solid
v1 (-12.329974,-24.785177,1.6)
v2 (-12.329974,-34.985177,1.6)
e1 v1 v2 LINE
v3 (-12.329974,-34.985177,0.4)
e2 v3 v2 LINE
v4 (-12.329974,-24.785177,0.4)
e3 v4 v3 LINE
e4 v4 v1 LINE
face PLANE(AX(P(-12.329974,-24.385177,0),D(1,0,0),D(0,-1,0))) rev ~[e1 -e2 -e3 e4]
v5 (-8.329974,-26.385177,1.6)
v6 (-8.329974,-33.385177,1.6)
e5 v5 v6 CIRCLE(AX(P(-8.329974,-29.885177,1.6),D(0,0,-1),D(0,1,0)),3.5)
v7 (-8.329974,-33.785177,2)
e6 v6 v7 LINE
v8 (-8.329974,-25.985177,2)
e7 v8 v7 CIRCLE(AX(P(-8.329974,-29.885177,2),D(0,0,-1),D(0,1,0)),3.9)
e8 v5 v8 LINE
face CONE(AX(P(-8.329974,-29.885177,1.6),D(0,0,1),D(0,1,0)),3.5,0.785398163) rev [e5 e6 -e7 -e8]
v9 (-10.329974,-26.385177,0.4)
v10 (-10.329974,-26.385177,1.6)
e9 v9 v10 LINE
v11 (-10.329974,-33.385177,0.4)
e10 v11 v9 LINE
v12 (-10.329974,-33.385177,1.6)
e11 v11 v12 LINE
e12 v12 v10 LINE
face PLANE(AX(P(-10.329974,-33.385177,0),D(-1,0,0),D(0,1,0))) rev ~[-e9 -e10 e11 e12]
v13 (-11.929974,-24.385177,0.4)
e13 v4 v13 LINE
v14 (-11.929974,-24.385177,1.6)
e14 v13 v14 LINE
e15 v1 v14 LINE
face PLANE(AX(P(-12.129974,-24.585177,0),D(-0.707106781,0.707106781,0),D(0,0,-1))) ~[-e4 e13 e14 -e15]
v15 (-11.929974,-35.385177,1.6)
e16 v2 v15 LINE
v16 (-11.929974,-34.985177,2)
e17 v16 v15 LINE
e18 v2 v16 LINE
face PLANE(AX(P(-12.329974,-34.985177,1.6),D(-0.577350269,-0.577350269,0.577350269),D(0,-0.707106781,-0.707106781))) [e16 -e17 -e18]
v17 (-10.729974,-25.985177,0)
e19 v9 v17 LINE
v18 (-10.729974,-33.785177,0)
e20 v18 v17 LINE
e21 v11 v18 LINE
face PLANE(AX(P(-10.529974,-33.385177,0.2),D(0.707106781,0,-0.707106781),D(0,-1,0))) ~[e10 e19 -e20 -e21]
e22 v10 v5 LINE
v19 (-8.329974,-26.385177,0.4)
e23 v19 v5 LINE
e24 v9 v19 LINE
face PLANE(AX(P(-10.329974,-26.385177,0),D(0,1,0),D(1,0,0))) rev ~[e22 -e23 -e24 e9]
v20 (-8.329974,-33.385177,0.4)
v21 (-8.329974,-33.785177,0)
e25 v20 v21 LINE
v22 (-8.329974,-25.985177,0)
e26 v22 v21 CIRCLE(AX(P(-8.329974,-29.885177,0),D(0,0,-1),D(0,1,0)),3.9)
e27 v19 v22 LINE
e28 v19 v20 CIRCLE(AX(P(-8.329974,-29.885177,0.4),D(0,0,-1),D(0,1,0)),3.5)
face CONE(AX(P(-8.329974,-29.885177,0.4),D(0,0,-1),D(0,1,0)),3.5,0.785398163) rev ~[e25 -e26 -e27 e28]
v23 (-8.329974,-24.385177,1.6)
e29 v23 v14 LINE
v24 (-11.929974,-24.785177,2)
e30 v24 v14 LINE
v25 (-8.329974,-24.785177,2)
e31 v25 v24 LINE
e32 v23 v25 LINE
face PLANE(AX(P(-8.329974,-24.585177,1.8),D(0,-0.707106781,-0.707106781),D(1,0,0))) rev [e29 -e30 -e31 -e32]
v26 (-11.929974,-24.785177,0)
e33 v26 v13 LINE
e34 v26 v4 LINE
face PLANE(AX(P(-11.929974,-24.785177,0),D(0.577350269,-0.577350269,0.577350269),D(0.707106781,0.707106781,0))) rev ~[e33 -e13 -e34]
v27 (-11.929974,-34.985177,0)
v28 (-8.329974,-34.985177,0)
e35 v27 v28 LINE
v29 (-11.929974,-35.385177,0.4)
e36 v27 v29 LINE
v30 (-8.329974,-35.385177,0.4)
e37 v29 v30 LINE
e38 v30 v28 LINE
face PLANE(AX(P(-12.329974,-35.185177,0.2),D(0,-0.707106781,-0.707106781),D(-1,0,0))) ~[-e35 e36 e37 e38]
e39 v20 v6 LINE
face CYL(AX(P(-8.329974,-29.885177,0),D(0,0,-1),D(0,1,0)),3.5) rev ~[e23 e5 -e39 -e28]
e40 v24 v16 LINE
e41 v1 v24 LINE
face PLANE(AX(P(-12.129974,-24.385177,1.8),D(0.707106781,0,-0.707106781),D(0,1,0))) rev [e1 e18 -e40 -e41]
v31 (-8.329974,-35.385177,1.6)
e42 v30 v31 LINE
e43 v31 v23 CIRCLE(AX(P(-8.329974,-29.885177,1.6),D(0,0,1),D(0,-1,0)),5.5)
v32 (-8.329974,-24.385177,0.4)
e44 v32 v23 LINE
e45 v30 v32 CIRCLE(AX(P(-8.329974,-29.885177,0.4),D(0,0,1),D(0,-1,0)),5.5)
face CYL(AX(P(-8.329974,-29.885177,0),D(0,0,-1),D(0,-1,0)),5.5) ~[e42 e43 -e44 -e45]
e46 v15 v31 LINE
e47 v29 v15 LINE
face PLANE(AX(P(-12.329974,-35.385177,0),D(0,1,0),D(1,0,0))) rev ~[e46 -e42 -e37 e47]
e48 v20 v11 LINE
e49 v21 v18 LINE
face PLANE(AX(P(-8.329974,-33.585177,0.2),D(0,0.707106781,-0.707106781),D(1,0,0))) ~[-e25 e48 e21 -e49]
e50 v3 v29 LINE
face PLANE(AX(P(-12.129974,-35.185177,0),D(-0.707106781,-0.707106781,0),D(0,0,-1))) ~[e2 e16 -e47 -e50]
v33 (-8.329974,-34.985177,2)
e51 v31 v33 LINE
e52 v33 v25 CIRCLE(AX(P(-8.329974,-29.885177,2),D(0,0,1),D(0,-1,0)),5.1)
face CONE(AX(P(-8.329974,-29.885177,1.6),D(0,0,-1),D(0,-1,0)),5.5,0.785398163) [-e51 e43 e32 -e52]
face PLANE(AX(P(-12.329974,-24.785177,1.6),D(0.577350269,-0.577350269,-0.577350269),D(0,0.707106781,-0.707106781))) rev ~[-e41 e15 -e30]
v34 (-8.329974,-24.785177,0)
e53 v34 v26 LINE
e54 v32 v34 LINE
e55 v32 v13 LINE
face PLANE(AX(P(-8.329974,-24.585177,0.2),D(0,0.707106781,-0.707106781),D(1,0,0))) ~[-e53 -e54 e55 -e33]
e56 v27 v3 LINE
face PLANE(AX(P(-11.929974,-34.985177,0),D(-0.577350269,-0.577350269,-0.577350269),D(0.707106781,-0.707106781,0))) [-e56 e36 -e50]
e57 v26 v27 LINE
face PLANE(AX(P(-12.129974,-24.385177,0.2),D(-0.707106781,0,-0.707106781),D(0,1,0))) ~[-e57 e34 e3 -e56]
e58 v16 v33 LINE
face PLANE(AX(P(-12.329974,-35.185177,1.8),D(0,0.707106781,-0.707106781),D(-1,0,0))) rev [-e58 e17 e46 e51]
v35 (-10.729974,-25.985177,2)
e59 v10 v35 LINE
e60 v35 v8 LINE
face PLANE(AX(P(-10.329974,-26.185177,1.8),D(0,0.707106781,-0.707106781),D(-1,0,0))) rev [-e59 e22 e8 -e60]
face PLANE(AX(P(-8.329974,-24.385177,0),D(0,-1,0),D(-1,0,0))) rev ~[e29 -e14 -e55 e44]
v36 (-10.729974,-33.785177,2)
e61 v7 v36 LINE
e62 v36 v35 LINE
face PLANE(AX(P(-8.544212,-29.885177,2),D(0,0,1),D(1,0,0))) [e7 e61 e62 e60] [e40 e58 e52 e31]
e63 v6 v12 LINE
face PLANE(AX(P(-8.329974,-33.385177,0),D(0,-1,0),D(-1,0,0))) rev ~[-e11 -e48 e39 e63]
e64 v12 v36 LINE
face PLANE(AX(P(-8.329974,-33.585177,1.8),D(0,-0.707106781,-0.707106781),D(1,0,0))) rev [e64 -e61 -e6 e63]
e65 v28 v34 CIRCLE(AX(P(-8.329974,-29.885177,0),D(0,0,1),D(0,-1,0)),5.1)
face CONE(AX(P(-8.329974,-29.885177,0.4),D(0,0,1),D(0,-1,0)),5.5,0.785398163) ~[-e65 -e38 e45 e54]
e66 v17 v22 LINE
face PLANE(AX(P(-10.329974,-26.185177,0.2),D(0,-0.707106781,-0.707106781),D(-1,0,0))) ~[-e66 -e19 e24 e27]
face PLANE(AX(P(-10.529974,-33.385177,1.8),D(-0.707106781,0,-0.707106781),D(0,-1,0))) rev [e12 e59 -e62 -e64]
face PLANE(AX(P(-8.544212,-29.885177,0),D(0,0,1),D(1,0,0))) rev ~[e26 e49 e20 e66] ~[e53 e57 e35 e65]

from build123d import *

# Parameters (mm, degrees)
F1_DEPTH = 2
F2_SIZE  = 0.4


# Not quite as in the source:
# - a feature names something its author has since deleted; it is built from what else it names


with BuildPart() as f1:
    # F0 (on Top) → F1 (new body)
    with BuildSketch(Plane.XY):
        with BuildLine():
            Line((-8.3299736083, -24.3851770833), (-12.3299736083, -24.3851770833))
            Line((-12.3299736083, -24.3851770833), (-12.3299736083, -35.3851770833))
            Line((-12.3299736083, -35.3851770833), (-8.3299736083, -35.3851770833))
            ThreePointArc((-8.3299736083, -35.3851770833), (-2.8299736083, -29.8851770833), (-8.3299736083, -24.3851770833))
        make_face()
        with BuildLine():
            Line((-10.3299736083, -33.3851770833), (-10.3299736083, -26.3851770833))
            Line((-10.3299736083, -26.3851770833), (-8.3299736083, -26.3851770833))
            ThreePointArc((-8.3299736083, -26.3851770833), (-4.8299736083, -29.8851770833), (-8.3299736083, -33.3851770833))
            Line((-8.3299736083, -33.3851770833), (-10.3299736083, -33.3851770833))
        make_face(mode=Mode.SUBTRACT)
    extrude(amount=F1_DEPTH)

    # F2
    f2_edges = [f1.edges().sort_by_distance(p)[0] for p in [
        (-9.329974, -33.385177, 2),
        (-10.329974, -29.885177, 2),
        (-9.329974, -26.385177, 2),
        (-10.329974, -35.385177, 2),
        (-12.329974, -29.885177, 2),
        (-12.329974, -35.385177, 1),
        (-10.329974, -24.385177, 2),
        (-12.329974, -24.385177, 1),
        (-12.329974, -29.885177, 0),
        (-10.329974, -29.885177, 0),
        (-9.329974, -26.385177, 0),
        (-10.329974, -24.385177, 0),
        (-9.329974, -33.385177, 0),
        (-10.329974, -35.385177, 0),
        (-2.829974, -29.885177, 0),
        (-2.829974, -29.885177, 2),
        (-4.829974, -29.885177, 0),
        (-4.829974, -29.885177, 2),
    ]]
    chamfer(f2_edges, length=F2_SIZE)


solid = f1.part
